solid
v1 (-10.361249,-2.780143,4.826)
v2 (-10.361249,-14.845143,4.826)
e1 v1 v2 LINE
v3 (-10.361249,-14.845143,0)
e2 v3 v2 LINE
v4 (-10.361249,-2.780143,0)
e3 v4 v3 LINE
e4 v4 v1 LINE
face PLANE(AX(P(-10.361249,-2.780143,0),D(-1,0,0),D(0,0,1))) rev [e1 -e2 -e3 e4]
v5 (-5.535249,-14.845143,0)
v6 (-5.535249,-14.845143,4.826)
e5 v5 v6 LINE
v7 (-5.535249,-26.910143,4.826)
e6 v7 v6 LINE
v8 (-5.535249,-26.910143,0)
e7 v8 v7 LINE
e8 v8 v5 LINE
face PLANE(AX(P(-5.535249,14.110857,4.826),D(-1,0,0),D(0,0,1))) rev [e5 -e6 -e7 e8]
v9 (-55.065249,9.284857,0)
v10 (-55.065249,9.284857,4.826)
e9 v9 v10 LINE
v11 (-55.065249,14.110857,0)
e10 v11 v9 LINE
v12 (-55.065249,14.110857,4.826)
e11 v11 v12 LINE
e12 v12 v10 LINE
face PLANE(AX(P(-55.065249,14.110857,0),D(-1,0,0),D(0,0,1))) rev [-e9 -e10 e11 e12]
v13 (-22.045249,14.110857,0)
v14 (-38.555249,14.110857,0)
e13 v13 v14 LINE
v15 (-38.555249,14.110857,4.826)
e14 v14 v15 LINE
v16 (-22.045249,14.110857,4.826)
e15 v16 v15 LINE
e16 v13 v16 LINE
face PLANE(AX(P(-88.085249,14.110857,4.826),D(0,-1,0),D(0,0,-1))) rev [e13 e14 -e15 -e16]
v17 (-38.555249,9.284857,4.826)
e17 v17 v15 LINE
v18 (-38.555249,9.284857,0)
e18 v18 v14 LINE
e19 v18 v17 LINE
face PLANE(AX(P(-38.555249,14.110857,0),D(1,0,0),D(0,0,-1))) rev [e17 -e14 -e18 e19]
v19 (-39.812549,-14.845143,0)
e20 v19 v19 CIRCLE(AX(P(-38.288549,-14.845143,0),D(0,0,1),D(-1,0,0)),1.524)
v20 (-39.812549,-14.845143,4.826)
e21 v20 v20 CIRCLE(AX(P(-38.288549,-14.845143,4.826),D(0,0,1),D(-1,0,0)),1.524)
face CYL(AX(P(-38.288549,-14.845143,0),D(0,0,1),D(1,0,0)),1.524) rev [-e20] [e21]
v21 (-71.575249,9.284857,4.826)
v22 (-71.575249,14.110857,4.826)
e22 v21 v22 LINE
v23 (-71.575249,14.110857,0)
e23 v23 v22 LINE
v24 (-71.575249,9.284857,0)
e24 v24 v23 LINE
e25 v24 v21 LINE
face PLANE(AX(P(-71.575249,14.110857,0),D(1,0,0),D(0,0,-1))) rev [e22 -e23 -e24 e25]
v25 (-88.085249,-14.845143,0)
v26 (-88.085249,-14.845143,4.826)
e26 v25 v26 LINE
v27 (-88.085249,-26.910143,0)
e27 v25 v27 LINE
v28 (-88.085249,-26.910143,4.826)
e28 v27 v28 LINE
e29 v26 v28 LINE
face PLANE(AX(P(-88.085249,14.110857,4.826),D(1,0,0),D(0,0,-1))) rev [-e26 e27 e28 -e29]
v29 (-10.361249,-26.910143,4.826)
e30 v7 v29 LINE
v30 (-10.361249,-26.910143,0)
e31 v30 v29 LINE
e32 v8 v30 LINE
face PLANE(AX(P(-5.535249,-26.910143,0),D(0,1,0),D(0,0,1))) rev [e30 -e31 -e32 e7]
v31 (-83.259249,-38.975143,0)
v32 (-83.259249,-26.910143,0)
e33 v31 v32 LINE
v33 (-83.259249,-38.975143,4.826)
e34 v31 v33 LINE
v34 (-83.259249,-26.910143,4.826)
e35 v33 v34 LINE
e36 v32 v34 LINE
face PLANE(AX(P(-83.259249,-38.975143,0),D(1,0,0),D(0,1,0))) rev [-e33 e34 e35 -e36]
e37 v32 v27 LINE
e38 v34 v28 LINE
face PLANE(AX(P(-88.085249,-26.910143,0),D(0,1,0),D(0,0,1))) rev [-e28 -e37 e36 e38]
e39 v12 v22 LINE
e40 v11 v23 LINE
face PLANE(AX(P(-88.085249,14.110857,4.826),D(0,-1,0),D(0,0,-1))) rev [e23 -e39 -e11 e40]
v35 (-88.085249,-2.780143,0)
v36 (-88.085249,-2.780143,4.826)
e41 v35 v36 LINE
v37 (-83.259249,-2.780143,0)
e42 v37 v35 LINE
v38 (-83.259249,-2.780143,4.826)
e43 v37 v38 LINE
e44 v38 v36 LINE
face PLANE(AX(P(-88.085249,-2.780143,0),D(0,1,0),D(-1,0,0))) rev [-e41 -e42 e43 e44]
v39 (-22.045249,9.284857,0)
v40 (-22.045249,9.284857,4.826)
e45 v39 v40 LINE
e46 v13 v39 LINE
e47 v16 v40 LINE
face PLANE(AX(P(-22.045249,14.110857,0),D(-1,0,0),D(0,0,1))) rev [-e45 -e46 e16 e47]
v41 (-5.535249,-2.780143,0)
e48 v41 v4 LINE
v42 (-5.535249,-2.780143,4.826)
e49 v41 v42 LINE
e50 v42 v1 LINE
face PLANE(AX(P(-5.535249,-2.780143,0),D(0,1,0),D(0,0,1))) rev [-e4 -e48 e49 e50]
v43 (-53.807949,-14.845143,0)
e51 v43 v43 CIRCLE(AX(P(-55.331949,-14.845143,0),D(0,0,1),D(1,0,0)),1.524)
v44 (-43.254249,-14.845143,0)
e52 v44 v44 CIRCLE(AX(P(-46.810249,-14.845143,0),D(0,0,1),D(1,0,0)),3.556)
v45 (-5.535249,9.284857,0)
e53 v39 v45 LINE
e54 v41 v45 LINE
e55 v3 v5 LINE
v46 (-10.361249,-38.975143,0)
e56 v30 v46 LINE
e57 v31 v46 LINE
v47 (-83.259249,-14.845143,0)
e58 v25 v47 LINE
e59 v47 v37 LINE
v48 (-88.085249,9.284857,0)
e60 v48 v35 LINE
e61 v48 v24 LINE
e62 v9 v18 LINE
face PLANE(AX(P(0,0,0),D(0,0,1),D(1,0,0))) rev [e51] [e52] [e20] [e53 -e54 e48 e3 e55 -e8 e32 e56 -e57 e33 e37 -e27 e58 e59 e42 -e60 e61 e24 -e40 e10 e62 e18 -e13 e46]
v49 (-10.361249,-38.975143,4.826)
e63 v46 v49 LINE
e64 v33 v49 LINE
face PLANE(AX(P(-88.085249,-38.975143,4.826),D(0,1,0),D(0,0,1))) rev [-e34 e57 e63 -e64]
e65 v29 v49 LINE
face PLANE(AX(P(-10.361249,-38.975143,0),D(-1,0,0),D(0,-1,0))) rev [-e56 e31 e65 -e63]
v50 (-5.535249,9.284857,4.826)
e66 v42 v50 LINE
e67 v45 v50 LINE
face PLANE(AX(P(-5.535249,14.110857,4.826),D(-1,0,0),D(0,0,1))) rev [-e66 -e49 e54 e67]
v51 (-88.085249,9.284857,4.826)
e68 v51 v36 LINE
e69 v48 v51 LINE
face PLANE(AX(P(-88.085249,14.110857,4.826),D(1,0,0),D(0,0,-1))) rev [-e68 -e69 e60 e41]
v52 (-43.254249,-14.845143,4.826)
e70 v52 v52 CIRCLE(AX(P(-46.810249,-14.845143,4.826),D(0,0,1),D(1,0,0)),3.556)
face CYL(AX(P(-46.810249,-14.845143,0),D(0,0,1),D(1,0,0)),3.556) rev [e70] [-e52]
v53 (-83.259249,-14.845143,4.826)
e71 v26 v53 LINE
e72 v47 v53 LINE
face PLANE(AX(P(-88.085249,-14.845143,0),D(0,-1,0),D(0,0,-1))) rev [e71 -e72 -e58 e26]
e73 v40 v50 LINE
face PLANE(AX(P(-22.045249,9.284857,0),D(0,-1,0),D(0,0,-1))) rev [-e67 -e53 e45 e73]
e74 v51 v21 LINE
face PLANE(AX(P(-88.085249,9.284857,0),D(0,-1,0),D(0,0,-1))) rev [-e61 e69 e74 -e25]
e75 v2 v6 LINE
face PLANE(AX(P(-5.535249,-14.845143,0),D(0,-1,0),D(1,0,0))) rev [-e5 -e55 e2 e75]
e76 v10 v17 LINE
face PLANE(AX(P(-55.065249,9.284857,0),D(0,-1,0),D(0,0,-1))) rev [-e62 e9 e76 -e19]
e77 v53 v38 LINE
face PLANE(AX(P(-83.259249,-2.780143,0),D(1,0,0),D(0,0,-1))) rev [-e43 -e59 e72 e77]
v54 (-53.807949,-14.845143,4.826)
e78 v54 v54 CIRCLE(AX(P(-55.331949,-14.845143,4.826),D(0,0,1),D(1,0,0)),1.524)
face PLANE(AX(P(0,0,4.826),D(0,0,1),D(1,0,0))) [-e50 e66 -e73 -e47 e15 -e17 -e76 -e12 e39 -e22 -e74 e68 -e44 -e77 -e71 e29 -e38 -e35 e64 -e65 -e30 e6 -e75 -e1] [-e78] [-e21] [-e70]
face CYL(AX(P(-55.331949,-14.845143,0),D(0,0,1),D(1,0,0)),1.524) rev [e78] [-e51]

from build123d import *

# Parameters (mm, degrees)
SKETCH1_W                = 82.55
SKETCH1_H                = 53.086
BOSS_EXTRUDE1_DEPTH      = 4.826
CUT_EXTRUDE1_START       = -88.085249325
CUT_EXTRUDE1_OUTLINE_W   = 4.826
CUT_EXTRUDE1_OUTLINE_H   = 4.826
CUT_EXTRUDE1_DEPTH       = 16.51
CUT_EXTRUDE1_START_2     = -55.065249325
CUT_EXTRUDE1_2_OUTLINE_W = 4.826
CUT_EXTRUDE1_2_OUTLINE_H = 4.826
CUT_EXTRUDE1_2_DEPTH     = 16.51
CUT_EXTRUDE1_START_3     = -22.045249325
CUT_EXTRUDE1_3_OUTLINE_W = 4.826
CUT_EXTRUDE1_3_OUTLINE_H = 4.826
CUT_EXTRUDE1_3_DEPTH     = 16.51
SKETCH3_W                = 4.826
SKETCH3_H                = 12.065
CUT_EXTRUDE2_DEPTH       = 97.443575108
SKETCH4_R                = 3.556
SKETCH4_R_2              = 1.524
CUT_EXTRUDE3_DEPTH       = 97.443575108


# Read off the part's stored shape, not the designer's step: Cut-Extrude1
with BuildPart() as part:
    # Sketch1 → Boss-Extrude1 (new body)
    with BuildSketch(Plane.XY):
        with Locations((-46.810249325, -12.432142782)):
            Rectangle(SKETCH1_W, SKETCH1_H)
    extrude(amount=BOSS_EXTRUDE1_DEPTH)

    # Cut-Extrude1 outline → Cut-Extrude1 (cut)
    with BuildSketch(Plane.YZ.offset(CUT_EXTRUDE1_START)):
        with Locations((11.697857218, 2.413)):
            Rectangle(CUT_EXTRUDE1_OUTLINE_W, CUT_EXTRUDE1_OUTLINE_H)
    extrude(amount=CUT_EXTRUDE1_DEPTH, mode=Mode.SUBTRACT)

    # Cut-Extrude1 2 outline → Cut-Extrude1 2 (cut)
    with BuildSketch(Plane.YZ.offset(CUT_EXTRUDE1_START_2)):
        with Locations((11.697857218, 2.413)):
            Rectangle(CUT_EXTRUDE1_2_OUTLINE_W, CUT_EXTRUDE1_2_OUTLINE_H)
    extrude(amount=CUT_EXTRUDE1_2_DEPTH, mode=Mode.SUBTRACT)

    # Cut-Extrude1 3 outline → Cut-Extrude1 3 (cut)
    with BuildSketch(Plane.YZ.offset(CUT_EXTRUDE1_START_3)):
        with Locations((11.697857218, 2.413)):
            Rectangle(CUT_EXTRUDE1_3_OUTLINE_W, CUT_EXTRUDE1_3_OUTLINE_H)
    extrude(amount=CUT_EXTRUDE1_3_DEPTH, mode=Mode.SUBTRACT)

    # Sketch3 → Cut-Extrude2 (cut, through all)
    with BuildSketch(Plane.XY.offset(4.826)):
        with Locations((-85.672249325, -32.942642782)):
            Rectangle(SKETCH3_W, SKETCH3_H)
        with Locations((-85.672249325, -8.812642782)):
            Rectangle(SKETCH3_W, SKETCH3_H)
        with Locations((-7.948249325, -32.942642782)):
            Rectangle(SKETCH3_W, SKETCH3_H)
        with Locations((-7.948249325, -8.812642782)):
            Rectangle(SKETCH3_W, SKETCH3_H)
    extrude(amount=-CUT_EXTRUDE2_DEPTH, mode=Mode.SUBTRACT)

    # Sketch4 → Cut-Extrude3 (cut, through all)
    with BuildSketch(Plane.XY.offset(4.826)):
        with Locations((-46.810249325, -14.845142782)):
            Circle(SKETCH4_R)
        with Locations((-55.331949325, -14.845142782)):
            Circle(SKETCH4_R_2)
        with Locations(Location((-38.288549325, -14.845142782, 0), (0, 0, 180))):
            Circle(SKETCH4_R_2)
    extrude(amount=-CUT_EXTRUDE3_DEPTH, mode=Mode.SUBTRACT)


solid = part.part
